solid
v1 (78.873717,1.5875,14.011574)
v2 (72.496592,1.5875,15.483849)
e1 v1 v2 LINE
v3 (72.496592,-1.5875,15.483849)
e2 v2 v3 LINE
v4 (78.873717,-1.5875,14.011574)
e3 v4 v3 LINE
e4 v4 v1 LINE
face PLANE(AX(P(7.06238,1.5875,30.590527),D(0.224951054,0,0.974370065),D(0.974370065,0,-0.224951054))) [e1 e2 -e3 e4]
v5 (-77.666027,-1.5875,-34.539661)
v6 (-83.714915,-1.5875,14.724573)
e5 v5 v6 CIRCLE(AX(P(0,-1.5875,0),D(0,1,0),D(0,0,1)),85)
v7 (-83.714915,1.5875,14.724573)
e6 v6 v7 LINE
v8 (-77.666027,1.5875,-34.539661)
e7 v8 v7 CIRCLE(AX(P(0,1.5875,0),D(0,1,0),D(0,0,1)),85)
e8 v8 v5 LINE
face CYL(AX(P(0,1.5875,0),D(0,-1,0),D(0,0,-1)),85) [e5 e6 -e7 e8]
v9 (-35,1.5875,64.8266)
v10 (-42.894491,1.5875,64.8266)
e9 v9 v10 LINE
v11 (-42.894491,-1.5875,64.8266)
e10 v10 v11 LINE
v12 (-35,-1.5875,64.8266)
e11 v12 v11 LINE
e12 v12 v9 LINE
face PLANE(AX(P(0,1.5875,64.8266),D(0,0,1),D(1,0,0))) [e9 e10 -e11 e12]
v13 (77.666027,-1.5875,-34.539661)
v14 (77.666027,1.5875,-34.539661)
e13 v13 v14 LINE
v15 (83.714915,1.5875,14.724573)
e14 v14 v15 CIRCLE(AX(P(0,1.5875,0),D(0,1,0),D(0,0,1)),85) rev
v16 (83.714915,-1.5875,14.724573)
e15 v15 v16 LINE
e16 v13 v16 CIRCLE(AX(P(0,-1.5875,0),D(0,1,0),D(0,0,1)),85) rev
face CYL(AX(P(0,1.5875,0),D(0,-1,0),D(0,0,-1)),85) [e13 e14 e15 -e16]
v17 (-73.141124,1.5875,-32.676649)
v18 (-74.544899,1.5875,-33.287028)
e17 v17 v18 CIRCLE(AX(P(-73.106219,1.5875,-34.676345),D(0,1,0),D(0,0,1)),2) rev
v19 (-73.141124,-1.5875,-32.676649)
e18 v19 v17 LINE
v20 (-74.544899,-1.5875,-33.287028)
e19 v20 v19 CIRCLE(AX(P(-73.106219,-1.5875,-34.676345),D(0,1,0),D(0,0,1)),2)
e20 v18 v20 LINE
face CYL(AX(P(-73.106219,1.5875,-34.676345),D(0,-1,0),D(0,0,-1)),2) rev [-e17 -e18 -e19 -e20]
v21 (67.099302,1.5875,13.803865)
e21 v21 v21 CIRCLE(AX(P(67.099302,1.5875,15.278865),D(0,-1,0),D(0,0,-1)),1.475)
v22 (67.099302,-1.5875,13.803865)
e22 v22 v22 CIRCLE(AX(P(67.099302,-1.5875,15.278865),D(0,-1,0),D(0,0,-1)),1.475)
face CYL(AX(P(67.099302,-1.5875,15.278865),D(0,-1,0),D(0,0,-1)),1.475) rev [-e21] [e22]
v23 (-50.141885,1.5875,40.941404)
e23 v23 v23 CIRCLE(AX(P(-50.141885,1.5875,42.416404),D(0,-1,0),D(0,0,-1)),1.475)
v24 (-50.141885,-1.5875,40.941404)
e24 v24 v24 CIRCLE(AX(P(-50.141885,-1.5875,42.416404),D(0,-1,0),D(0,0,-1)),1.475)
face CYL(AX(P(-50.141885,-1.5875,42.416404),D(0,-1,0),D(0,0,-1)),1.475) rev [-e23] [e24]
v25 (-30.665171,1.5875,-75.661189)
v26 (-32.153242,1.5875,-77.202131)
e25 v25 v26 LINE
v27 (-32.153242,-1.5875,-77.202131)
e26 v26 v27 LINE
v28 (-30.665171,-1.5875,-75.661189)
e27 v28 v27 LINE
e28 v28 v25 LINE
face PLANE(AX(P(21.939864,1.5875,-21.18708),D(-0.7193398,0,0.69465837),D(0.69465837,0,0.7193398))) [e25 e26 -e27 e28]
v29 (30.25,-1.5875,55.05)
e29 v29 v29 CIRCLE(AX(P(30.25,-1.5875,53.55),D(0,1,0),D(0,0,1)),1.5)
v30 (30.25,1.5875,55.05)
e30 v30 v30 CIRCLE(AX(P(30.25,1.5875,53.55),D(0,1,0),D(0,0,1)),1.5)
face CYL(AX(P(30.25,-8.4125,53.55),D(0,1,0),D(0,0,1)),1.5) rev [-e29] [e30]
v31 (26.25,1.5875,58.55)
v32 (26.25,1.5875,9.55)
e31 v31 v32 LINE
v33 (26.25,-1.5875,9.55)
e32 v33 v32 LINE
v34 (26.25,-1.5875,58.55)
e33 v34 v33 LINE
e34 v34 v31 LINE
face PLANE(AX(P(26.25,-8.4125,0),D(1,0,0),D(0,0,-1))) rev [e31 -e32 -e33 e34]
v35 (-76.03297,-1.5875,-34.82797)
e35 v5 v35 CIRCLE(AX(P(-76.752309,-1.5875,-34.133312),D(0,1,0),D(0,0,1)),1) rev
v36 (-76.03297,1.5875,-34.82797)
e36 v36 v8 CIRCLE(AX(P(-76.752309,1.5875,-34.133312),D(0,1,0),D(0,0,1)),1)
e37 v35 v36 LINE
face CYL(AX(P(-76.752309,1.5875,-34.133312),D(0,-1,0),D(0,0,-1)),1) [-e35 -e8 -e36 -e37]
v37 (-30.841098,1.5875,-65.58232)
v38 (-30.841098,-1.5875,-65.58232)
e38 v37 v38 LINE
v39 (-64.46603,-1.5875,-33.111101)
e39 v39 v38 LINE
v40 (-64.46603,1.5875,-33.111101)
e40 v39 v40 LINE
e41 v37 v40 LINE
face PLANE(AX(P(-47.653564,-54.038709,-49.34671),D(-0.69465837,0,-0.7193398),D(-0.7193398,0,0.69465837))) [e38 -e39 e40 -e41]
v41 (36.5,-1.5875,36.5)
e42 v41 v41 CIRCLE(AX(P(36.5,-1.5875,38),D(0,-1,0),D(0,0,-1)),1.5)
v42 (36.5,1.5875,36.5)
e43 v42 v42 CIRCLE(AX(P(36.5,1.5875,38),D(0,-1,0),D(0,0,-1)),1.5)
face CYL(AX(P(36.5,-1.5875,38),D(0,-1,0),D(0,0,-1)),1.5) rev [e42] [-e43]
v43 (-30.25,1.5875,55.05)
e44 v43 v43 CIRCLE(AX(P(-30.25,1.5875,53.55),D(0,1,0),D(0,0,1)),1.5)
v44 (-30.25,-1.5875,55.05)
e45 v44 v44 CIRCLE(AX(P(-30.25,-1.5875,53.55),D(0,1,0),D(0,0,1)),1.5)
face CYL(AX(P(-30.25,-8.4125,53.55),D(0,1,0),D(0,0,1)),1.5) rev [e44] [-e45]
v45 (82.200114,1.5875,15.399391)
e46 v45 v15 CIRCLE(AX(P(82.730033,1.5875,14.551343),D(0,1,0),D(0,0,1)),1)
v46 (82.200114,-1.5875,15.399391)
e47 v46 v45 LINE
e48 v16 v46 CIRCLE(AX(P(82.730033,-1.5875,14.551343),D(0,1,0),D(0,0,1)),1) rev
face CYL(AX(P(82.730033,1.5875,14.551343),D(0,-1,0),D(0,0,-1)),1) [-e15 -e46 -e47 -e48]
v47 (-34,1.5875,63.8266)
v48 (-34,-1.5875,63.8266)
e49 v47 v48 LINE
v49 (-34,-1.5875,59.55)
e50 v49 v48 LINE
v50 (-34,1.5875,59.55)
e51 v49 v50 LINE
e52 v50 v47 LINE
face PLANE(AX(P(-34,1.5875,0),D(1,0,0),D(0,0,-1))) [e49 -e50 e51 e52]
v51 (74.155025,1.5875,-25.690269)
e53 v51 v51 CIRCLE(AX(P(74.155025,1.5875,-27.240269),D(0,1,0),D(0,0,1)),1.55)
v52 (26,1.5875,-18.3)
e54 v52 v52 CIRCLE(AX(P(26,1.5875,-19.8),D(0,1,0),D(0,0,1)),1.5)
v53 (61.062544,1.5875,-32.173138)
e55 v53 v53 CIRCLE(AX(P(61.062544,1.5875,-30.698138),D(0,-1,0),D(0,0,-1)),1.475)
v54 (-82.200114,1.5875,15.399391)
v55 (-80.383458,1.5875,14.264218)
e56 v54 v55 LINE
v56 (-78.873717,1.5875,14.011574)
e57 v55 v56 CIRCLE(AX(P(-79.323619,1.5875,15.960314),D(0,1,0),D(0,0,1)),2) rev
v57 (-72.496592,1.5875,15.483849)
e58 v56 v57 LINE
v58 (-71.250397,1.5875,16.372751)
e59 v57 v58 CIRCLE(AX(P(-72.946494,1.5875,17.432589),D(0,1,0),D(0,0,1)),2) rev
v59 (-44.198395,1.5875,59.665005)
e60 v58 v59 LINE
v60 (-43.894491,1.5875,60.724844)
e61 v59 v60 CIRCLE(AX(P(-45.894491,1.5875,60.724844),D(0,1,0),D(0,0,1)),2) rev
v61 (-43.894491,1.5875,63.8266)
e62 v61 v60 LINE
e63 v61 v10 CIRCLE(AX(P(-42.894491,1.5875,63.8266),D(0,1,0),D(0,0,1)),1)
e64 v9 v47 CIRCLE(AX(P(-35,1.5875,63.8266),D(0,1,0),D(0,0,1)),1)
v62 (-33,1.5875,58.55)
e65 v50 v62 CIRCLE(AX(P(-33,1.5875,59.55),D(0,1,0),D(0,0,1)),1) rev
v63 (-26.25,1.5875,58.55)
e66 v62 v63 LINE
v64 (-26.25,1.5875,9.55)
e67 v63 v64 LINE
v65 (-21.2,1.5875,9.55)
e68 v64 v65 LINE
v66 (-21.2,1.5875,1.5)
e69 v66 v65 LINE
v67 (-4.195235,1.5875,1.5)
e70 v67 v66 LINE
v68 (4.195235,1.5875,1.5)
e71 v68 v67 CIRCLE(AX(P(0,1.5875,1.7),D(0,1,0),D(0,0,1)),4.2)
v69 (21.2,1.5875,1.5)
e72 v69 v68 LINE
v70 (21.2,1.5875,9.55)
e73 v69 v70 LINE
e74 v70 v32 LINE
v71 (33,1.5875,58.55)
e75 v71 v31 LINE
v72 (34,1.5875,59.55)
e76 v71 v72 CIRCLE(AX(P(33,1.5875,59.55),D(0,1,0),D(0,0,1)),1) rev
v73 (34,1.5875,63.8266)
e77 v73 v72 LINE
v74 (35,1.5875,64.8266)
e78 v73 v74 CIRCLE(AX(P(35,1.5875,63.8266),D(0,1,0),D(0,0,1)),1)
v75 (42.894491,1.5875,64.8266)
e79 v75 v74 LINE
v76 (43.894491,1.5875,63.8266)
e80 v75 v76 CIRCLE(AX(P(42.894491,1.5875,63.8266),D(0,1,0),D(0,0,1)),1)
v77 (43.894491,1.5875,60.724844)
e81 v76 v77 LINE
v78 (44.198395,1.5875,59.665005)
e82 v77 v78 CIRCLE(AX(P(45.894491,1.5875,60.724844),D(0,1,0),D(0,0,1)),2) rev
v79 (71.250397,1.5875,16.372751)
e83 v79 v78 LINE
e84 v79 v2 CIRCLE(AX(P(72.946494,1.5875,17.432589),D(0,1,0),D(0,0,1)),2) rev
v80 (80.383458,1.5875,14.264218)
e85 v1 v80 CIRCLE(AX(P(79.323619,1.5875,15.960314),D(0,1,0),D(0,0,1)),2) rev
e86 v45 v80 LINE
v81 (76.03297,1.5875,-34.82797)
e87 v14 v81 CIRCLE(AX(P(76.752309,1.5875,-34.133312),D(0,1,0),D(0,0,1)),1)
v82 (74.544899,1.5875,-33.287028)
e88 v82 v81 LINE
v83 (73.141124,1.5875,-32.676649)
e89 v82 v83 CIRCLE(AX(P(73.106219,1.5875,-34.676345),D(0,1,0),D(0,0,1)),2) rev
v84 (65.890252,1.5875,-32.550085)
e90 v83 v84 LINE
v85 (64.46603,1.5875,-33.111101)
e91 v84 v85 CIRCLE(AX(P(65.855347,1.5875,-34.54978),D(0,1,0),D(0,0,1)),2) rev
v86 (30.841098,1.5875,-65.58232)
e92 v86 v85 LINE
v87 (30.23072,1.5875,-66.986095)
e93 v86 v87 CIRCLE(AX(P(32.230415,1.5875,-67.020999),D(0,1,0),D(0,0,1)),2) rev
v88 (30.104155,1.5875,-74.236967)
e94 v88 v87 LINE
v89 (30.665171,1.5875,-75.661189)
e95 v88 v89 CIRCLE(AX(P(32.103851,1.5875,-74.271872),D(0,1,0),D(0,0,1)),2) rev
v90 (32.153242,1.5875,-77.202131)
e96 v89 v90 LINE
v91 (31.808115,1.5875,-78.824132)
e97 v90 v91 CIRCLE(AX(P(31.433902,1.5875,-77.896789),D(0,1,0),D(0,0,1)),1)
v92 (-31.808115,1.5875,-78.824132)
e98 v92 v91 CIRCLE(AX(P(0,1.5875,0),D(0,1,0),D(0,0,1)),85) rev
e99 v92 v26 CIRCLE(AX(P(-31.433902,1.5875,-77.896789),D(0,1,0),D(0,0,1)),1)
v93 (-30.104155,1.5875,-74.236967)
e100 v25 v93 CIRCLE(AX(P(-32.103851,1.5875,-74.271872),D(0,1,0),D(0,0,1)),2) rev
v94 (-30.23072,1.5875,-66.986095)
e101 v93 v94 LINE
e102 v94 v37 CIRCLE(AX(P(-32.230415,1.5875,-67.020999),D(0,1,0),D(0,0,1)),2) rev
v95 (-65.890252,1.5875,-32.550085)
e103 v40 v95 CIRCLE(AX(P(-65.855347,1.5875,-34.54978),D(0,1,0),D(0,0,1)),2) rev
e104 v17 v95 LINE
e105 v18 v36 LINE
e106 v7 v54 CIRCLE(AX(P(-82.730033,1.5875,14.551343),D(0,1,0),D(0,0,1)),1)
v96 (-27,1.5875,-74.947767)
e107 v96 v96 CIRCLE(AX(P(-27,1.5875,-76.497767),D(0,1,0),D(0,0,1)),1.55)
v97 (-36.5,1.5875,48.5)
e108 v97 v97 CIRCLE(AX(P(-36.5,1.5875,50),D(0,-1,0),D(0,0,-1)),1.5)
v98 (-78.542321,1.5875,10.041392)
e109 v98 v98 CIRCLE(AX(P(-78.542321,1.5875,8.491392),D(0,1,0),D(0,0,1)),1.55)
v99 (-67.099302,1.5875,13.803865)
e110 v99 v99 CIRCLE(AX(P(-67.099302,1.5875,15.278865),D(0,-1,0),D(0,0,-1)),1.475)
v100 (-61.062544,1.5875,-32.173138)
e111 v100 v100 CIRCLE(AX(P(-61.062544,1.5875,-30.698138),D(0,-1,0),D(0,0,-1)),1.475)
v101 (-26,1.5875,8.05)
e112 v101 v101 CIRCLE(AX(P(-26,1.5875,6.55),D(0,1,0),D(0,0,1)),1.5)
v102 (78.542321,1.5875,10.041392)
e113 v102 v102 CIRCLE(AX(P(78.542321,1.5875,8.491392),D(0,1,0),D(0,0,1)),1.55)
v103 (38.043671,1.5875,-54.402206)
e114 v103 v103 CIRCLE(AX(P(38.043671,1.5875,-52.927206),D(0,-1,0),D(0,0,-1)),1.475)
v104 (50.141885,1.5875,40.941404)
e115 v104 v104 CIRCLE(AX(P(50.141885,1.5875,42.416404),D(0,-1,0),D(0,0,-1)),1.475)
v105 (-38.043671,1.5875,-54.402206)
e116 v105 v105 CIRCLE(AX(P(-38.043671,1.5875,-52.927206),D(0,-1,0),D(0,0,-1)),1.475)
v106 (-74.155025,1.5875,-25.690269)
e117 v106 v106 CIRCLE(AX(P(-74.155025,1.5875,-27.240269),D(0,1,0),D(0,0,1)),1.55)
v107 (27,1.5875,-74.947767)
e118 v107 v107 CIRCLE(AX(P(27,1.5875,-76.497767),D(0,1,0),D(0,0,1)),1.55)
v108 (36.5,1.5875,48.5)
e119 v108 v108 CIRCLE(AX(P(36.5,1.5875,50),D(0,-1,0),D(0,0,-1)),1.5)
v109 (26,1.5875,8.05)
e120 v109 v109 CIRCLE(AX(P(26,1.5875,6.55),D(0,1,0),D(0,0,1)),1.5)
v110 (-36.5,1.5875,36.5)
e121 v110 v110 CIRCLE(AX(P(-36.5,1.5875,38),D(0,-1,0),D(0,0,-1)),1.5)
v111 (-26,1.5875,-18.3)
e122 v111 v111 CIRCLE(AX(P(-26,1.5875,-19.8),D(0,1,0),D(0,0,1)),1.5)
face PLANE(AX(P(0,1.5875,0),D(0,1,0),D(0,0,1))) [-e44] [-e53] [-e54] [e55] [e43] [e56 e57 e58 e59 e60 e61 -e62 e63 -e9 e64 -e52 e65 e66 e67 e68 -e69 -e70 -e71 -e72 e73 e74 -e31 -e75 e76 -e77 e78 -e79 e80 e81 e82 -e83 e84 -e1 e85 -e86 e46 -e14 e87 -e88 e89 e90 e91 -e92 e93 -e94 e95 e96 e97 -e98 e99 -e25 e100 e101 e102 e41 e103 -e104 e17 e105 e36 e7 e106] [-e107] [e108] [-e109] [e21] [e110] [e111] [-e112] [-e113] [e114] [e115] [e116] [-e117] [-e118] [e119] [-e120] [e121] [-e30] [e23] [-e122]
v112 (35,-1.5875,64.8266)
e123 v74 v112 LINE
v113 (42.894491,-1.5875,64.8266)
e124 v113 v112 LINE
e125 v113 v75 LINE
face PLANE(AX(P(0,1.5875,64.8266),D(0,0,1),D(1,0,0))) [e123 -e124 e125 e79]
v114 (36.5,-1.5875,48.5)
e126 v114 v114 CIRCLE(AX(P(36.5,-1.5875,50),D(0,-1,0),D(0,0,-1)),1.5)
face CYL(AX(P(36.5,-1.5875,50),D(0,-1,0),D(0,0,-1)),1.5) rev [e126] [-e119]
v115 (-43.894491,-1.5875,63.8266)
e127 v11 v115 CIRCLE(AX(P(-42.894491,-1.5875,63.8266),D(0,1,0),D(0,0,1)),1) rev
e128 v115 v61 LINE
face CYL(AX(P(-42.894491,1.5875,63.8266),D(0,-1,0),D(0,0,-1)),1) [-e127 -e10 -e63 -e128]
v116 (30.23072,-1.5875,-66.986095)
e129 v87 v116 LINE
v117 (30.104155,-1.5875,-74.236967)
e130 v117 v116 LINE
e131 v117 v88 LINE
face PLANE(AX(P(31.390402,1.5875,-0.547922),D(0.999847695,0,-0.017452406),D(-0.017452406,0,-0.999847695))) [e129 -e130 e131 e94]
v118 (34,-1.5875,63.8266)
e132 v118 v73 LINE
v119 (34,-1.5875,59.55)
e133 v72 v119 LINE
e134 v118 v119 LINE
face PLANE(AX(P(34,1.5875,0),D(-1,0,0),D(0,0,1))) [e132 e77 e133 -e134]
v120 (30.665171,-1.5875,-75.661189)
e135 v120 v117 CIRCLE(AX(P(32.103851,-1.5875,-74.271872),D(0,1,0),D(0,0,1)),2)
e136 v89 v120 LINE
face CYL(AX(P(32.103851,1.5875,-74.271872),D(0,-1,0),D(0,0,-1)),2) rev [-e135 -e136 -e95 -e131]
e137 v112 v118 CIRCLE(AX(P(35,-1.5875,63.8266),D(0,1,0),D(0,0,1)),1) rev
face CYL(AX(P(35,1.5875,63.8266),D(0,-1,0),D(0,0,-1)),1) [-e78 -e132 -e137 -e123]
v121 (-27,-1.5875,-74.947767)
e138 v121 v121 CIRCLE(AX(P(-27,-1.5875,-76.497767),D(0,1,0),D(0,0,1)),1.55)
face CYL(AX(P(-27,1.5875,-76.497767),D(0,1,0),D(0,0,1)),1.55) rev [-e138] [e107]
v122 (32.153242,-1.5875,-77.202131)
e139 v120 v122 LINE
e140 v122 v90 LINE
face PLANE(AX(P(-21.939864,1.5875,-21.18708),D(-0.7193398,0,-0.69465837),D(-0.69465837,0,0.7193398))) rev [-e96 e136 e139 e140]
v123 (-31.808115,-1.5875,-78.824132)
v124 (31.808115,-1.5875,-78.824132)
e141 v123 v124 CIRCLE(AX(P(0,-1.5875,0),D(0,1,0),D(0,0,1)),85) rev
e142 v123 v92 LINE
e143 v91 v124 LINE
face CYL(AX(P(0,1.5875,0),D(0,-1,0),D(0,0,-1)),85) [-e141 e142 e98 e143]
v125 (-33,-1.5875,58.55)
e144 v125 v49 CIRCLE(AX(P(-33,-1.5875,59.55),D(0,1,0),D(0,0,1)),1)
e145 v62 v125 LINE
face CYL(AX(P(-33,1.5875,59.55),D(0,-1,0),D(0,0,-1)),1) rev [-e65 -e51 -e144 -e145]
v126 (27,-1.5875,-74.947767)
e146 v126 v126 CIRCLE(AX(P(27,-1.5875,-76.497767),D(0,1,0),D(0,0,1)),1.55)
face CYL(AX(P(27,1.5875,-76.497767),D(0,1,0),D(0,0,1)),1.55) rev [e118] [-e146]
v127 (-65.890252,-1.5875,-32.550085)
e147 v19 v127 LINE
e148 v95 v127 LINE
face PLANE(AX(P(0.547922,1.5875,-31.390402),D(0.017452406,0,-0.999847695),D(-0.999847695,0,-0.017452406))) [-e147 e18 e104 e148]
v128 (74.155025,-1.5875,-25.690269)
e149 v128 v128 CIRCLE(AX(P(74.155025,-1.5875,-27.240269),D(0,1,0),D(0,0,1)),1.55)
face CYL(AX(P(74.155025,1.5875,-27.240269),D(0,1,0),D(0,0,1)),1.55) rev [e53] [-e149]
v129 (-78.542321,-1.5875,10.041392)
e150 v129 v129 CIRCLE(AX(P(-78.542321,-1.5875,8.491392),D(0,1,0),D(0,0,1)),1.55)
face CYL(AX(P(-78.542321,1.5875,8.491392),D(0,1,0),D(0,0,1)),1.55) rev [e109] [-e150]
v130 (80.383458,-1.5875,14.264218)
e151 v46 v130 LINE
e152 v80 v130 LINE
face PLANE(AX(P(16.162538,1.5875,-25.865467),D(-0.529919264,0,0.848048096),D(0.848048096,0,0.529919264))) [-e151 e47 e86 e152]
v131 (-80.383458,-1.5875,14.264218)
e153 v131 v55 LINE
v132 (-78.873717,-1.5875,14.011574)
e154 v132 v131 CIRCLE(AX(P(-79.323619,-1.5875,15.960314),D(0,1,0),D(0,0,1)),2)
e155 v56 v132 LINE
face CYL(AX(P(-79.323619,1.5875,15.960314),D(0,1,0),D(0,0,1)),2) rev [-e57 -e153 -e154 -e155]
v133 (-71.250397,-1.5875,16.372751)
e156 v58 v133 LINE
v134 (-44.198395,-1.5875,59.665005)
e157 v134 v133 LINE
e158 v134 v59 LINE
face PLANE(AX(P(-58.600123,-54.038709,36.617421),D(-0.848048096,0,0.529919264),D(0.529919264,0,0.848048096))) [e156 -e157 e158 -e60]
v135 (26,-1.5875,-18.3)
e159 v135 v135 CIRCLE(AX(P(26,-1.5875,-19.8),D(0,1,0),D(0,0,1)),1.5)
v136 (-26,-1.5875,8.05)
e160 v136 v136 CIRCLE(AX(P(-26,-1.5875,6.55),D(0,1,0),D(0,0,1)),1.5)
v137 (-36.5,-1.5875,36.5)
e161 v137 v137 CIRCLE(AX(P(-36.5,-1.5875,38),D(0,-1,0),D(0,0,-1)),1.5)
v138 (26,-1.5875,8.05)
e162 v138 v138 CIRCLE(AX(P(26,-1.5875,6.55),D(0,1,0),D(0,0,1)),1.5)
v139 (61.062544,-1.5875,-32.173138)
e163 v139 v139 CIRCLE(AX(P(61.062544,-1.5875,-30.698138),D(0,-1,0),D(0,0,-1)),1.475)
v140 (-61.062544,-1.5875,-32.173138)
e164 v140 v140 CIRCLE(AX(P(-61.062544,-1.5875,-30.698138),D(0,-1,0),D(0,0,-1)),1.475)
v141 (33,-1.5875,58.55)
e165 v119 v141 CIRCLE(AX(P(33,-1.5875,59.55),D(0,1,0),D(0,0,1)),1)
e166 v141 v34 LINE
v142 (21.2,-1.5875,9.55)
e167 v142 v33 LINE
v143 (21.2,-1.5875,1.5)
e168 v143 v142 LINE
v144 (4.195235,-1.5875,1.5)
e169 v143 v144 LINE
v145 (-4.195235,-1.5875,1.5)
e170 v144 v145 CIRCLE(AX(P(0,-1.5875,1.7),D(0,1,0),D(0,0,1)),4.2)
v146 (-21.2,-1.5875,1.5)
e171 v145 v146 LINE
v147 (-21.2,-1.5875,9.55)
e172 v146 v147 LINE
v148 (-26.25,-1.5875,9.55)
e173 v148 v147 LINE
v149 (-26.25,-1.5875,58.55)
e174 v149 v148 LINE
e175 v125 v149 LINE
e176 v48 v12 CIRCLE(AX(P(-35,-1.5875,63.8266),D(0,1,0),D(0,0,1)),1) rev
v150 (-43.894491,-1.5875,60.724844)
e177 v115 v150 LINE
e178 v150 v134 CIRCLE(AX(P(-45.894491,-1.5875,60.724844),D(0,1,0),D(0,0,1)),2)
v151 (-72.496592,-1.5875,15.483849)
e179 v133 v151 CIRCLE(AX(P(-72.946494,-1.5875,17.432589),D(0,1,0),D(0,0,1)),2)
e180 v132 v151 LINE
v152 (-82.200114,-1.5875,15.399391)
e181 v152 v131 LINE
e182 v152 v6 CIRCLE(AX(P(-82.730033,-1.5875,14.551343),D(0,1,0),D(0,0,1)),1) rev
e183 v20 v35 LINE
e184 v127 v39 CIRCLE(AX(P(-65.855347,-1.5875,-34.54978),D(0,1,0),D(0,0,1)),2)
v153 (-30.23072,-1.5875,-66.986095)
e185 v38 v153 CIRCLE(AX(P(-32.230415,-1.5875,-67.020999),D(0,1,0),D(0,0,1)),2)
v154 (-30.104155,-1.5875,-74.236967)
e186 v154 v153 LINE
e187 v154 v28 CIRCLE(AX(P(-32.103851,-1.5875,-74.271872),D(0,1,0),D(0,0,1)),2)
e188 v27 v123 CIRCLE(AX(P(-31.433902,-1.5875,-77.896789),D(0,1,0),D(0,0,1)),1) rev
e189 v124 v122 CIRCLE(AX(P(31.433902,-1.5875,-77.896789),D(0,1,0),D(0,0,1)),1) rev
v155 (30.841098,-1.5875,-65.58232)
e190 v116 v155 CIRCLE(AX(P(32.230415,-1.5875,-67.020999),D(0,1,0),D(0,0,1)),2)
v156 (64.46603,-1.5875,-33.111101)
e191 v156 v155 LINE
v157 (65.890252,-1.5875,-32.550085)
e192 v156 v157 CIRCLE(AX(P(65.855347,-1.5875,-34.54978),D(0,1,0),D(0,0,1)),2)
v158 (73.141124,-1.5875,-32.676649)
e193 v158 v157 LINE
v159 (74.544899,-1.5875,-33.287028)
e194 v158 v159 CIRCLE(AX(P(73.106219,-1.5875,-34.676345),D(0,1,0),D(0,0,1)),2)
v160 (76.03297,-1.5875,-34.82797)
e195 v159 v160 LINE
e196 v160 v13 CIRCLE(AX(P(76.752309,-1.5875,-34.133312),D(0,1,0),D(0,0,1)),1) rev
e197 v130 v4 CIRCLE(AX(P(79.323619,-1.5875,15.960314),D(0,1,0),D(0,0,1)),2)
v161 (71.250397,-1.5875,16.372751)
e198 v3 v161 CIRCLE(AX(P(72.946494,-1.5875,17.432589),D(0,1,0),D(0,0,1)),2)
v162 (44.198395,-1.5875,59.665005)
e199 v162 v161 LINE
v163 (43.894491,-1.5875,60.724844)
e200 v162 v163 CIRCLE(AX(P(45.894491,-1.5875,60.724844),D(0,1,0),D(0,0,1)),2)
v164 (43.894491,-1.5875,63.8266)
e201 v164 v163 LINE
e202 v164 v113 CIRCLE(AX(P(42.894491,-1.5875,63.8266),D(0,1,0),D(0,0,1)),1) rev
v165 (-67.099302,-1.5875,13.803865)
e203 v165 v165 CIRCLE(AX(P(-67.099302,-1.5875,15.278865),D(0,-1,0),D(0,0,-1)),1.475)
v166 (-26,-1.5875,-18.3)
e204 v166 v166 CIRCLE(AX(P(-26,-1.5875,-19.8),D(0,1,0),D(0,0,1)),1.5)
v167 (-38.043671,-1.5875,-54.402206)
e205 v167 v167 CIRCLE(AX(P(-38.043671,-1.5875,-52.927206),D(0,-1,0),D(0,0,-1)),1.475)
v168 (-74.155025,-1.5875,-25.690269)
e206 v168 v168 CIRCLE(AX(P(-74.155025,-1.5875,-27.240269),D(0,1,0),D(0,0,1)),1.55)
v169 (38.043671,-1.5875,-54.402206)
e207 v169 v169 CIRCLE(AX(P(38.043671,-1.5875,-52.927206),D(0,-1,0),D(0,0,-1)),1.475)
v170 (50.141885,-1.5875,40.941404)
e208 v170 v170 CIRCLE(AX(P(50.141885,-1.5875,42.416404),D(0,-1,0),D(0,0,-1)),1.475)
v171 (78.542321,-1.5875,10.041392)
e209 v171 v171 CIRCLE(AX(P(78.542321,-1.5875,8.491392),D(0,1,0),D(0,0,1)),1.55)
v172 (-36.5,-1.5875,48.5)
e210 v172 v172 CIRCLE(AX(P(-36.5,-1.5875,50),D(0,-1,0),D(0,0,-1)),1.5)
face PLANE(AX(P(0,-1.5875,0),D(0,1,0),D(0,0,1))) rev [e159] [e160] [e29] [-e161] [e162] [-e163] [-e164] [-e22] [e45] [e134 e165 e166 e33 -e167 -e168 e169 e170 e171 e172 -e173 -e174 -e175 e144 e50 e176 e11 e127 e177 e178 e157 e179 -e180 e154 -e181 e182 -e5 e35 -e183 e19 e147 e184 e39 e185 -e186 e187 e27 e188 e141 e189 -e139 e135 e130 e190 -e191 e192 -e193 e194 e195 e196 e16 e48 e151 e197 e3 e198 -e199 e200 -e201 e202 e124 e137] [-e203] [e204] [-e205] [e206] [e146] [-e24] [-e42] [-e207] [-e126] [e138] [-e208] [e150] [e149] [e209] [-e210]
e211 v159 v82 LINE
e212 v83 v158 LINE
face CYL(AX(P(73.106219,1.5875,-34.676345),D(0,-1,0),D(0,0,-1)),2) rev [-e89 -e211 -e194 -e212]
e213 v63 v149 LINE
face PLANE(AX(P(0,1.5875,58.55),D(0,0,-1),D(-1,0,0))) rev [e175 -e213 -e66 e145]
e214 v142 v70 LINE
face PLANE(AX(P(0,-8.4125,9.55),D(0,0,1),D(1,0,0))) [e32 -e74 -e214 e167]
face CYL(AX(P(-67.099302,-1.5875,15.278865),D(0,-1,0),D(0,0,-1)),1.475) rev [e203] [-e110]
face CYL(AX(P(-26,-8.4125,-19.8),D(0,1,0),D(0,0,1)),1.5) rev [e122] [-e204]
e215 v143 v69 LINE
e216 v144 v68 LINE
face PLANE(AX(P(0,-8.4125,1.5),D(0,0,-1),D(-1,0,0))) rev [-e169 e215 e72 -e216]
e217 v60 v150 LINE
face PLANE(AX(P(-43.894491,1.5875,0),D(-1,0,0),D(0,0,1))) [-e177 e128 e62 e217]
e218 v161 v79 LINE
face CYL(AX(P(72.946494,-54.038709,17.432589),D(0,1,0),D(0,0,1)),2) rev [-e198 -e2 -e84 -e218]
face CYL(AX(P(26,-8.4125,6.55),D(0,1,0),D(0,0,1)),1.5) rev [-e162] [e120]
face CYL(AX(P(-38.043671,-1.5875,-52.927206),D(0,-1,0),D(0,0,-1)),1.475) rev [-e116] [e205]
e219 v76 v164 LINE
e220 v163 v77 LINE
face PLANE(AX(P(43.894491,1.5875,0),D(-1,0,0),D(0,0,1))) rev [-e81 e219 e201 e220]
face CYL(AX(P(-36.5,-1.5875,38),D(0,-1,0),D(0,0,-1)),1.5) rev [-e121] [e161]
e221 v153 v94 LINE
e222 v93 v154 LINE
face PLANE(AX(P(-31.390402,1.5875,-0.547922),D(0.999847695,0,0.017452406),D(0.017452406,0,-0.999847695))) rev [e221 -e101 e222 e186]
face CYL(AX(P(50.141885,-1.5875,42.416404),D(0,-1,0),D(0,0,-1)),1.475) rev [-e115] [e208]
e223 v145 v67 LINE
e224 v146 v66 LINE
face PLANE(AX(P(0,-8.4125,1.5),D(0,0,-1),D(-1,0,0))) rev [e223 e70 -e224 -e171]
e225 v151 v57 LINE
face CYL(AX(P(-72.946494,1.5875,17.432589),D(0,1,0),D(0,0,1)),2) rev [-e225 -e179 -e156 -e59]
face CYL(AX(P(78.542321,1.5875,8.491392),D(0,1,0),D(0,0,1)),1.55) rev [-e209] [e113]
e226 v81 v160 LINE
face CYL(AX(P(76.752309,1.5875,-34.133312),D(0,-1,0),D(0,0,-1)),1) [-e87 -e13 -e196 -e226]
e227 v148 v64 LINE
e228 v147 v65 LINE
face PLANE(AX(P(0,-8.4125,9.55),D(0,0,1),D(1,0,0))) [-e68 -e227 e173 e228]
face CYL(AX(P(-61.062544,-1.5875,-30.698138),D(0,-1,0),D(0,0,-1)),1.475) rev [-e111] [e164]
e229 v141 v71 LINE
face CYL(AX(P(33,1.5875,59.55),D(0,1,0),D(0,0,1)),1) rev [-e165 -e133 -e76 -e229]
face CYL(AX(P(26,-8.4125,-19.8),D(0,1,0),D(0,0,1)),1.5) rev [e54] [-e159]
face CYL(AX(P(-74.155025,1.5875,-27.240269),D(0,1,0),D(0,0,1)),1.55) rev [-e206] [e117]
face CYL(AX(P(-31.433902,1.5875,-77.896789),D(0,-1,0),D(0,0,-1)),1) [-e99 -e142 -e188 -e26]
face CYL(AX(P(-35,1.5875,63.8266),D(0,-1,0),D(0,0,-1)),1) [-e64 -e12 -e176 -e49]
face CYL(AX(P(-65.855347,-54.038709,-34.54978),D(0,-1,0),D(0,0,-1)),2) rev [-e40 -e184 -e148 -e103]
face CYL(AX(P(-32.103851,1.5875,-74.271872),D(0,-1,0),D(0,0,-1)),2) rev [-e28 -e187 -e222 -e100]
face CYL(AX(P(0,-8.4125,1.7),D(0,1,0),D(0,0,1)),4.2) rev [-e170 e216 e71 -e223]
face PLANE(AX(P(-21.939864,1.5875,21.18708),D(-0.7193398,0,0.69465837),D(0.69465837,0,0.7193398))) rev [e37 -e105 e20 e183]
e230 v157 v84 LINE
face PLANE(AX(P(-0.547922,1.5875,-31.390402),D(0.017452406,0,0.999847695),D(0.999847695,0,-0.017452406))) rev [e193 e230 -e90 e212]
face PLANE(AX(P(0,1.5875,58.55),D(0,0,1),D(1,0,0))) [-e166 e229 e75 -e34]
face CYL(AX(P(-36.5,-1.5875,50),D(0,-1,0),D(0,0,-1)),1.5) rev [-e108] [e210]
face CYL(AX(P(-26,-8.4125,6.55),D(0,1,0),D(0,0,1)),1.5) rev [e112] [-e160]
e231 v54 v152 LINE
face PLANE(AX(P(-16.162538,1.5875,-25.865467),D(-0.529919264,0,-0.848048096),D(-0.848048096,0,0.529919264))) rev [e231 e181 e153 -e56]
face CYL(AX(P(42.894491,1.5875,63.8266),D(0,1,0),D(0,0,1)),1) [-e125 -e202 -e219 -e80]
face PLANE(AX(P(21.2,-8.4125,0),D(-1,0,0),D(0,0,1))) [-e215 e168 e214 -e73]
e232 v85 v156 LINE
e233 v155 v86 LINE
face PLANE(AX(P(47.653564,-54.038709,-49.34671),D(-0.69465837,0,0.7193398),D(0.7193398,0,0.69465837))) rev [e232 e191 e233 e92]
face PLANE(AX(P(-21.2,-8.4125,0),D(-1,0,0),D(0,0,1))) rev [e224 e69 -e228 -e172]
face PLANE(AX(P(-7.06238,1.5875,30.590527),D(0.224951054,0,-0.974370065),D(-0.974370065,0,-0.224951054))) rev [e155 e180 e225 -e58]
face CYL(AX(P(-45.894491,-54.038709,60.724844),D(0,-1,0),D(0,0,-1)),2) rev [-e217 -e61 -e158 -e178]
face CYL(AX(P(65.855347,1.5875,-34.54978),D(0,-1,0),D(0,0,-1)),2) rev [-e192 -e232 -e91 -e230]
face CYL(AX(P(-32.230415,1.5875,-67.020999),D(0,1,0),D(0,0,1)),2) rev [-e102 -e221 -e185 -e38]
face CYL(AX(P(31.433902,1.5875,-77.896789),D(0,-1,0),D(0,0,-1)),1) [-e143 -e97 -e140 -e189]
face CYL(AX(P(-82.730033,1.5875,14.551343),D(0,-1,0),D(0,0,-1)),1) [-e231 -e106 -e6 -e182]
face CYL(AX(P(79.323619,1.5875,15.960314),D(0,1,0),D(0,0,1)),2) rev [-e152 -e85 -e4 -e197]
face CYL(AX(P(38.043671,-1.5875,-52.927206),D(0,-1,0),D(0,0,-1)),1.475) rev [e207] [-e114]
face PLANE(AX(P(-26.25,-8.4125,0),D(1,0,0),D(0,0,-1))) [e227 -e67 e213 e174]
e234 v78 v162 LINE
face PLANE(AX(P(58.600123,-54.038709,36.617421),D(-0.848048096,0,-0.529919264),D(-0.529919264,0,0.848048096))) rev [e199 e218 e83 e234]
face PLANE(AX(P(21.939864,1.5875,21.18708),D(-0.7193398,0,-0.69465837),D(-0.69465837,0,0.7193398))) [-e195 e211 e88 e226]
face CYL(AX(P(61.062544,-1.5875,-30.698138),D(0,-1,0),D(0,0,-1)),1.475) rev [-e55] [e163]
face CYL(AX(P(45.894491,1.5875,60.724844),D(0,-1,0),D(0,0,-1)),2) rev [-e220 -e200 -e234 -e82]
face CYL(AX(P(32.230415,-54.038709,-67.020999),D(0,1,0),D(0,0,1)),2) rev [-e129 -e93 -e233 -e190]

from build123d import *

# Parameters (mm, degrees)
BOSS_EXTRUDE4_DEPTH  = 1.5875
M3_CLEARANCE_HOLE3_D = 3
M3_CLEARANCE_HOLE1_D = 3.1
M3_CLEARANCE_HOLE4_D = 2.95
M3_CLEARANCE_HOLE2_D = 3.1
BOSS_EXTRUDE6_DEPTH  = 3.175
FILLET1_R            = 2
FILLET3_R            = 1
FILLET6_R            = 0.5
CUT_EXTRUDE4_DEPTH   = 10
SKETCH29_R           = 1.5
CUT_EXTRUDE5_DEPTH   = 10
SKETCH31_R           = 1.5
CUT_EXTRUDE7_DEPTH   = 10


with BuildPart() as part:
    # Sketch1 → Boss-Extrude4 (new, symmetric)
    with BuildSketch(Plane(origin=(0, 0, 0), x_dir=(1, 0, 0), z_dir=(0, 1, 0))):
        with BuildLine():
            Line((-62.799553621, 32.496136604), (-73.969425011, 32.691107434))
            Line((-73.969425011, 32.691107434), (-77.053684287, 35.88495141))
            ThreePointArc((-77.053684287, 35.88495141), (-84.36642289, 10.358894189), (-83.446216027, -16.178041625))
            Line((-83.446216027, -16.178041625), (-79.680911643, -13.825218315))
            Line((-79.680911643, -13.825218315), (-69.484649137, -16.179210996))
            Line((-69.484649137, -16.179210996), (-43.894490772, -57.132025032))
            Line((-43.894490772, -57.132025032), (-43.894490772, -64.826600275))
            Line((-43.894490772, -64.826600275), (-43.094490772, -64.826600275))
            Line((-43.094490772, -64.826600275), (-34, -64.826600275))
            Line((-34, -64.826600275), (-34, -59.55))
            Line((-34, -59.55), (-34, -58.55))
            Line((-34, -58.55), (-20, -58.55))
            Line((-20, -58.55), (-19.859459165, -59.55))
            Line((-19.859459165, -59.55), (19.859459165, -59.55))
            Line((19.859459165, -59.55), (20, -58.55))
            Line((20, -58.55), (34, -58.55))
            Line((34, -58.55), (34, -59.55))
            Line((34, -59.55), (34, -64.826600275))
            Line((34, -64.826600275), (43.094490772, -64.826600275))
            Line((43.094490772, -64.826600275), (43.894490772, -64.826600275))
            Line((43.894490772, -64.826600275), (43.894490772, -57.132025032))
            Line((43.894490772, -57.132025032), (69.484649137, -16.179210996))
            Line((69.484649137, -16.179210996), (79.680911643, -13.825218315))
            Line((79.680911643, -13.825218315), (83.446216027, -16.178041625))
            ThreePointArc((83.446216027, -16.178041625), (84.610662337, -8.126242604), (85, 0))
            ThreePointArc((85, 0), (82.98964744, 18.377116688), (77.053684287, 35.88495141))
            Line((77.053684287, 35.88495141), (73.969425011, 32.691107434))
            Line((73.969425011, 32.691107434), (62.799553621, 32.496136604))
            Line((62.799553621, 32.496136604), (30.284668021, 63.895396642))
            Line((30.284668021, 63.895396642), (30.089697191, 75.065268032))
            Line((30.089697191, 75.065268032), (33.173956467, 78.259112008))
            ThreePointArc((33.173956467, 78.259112008), (0, 85), (-33.173956467, 78.259112008))
            Line((-33.173956467, 78.259112008), (-30.089697191, 75.065268032))
            Line((-30.089697191, 75.065268032), (-30.284668021, 63.895396642))
            Line((-30.284668021, 63.895396642), (-62.799553621, 32.496136604))
        make_face()
    extrude(amount=BOSS_EXTRUDE4_DEPTH, both=True)

    # M3 Clearance Hole3 (through all)
    with Locations(Plane(origin=(0, -1.5875, 0), x_dir=(-1, 0, 0), z_dir=(0, -1, 0))):
        with Locations((36.5, -50), (36.5, -38), (-36.5, -50), (-36.5, -38)):
            Hole(M3_CLEARANCE_HOLE3_D / 2)

    # M3 Clearance Hole1 (through all)
    with Locations(Plane(origin=(0, 1.5875, 0), x_dir=(1, 0, 0), z_dir=(0, 1, 0))):
        with Locations((-78.542321426, -8.49139241), (78.542321426, -8.49139241), (74.155025063, 27.240269049), (-74.155025063, 27.240269049)):
            Hole(M3_CLEARANCE_HOLE1_D / 2)

    # M3 Clearance Hole4 (through all)
    with Locations(Plane(origin=(0, -1.5875, 0), x_dir=(-1, 0, 0), z_dir=(0, -1, 0))):
        with Locations((-67.099301622, -15.278865202), (-50.141885166, -42.416404279), (-61.062544382, 30.698137949), (-38.043670771, 52.927205804), (50.141885166, -42.416404279), (67.099301622, -15.278865202), (38.043670771, 52.927205804), (61.062544382, 30.698137949)):
            Hole(M3_CLEARANCE_HOLE4_D / 2)

    # M3 Clearance Hole2 (through all)
    with Locations(Plane(origin=(0, 1.5875, 0), x_dir=(1, 0, 0), z_dir=(0, 1, 0))):
        with Locations((27, 76.497766718), (-27, 76.497766718)):
            Hole(M3_CLEARANCE_HOLE2_D / 2)

    # Sketch22 → Boss-Extrude6 (add)
    with BuildSketch(Plane(origin=(0, 1.5875, 0), x_dir=(1, 0, 0), z_dir=(0, 1, 0))):
        Polygon((65.061950694, 32.535626892), (30.245177733, 66.157793715), (30.284668021, 63.895396642), (62.799553621, 32.496136604), align=None)
        Polygon((-30.284668021, 63.895396642), (-30.245177733, 66.157793715), (-65.061950694, 32.535626892), (-62.799553621, 32.496136604), align=None)
        Polygon((43.894490772, -60.151352895), (71.689396914, -15.670204865), (69.484649137, -16.179210996), (43.894490772, -57.132025032), align=None)
        Polygon((-69.484649137, -16.179210996), (-71.689396914, -15.670204865), (-43.894490772, -60.151352895), (-43.894490772, -57.132025032), align=None)
    extrude(amount=-BOSS_EXTRUDE6_DEPTH)

    # Fillet1
    fillet1_edges = [part.edges().sort_by_distance(p)[0] for p in [
        (-30.245177733, 0.79375, -66.157793715),
        (-65.061950694, 0.79375, -32.535626892),
        (-71.689396914, 0.79375, 15.670204865),
        (-43.894490772, 0.79375, 60.151352895),
        (43.894490772, -0.79375, 60.151352895),
        (71.689396914, -0.79375, 15.670204865),
        (65.061950694, 0.79375, -32.535626892),
        (30.245177733, -0.79375, -66.157793715),
        (30.089697191, -0.79375, -75.065268032),
        (73.969425011, -0.79375, -32.691107434),
        (79.680911643, -0.79375, 13.825218315),
        (-79.680911643, -0.79375, 13.825218315),
        (-73.969425011, -0.79375, -32.691107434),
        (-30.089697191, -0.79375, -75.065268032),
    ]]
    fillet(fillet1_edges, radius=FILLET1_R)

    # Fillet3
    fillet3_edges = [part.edges().sort_by_distance(p)[0] for p in [
        (33.173956467, -0.79375, -78.259112008),
        (77.053684287, 0.79375, -35.88495141),
        (83.446216027, -0.79375, 16.178041625),
        (43.894490772, -0.79375, 64.826600275),
        (34, 0.79375, 64.826600275),
        (34, -0.79375, 58.55),
        (-34, -0.79375, 58.55),
        (-34, 0.79375, 64.826600275),
        (-43.894490772, -0.79375, 64.826600275),
        (-83.446216027, -0.79375, 16.178041625),
        (-77.053684287, -0.79375, -35.88495141),
        (-33.173956467, -0.79375, -78.259112008),
    ]]
    fillet(fillet3_edges, radius=FILLET3_R - 0.0001)  # a hair under: the kernel refuses the full size

    # Fillet6
    fillet6_edges = [part.edges().sort_by_distance(p)[0] for p in [
        (20, -0.79375, 58.55),
        (19.859459165, -0.79375, 59.55),
        (-19.859459165, 0.79375, 59.55),
        (-20, 0.79375, 58.55),
    ]]
    fillet(fillet6_edges, radius=FILLET6_R)

    # Sketch28 → Cut-Extrude4 (cut)
    with BuildSketch(Plane(origin=(0, 1.5875, 0), x_dir=(1, 0, 0), z_dir=(0, 1, 0))):
        with BuildLine():
            Line((-26.25, -9.55), (-26.25, -59.55))
            Line((-26.25, -59.55), (26.25, -59.55))
            Line((26.25, -59.55), (26.25, -9.55))
            Line((26.25, -9.55), (21.2, -9.55))
            Line((21.2, -9.55), (21.2, -1.5))
            Line((21.2, -1.5), (4.195235393, -1.5))
            ThreePointArc((4.195235393, -1.5), (0, 2.5), (-4.195235393, -1.5))
            Line((-4.195235393, -1.5), (-21.2, -1.5))
            Line((-21.2, -1.5), (-21.2, -9.55))
            Line((-21.2, -9.55), (-26.25, -9.55))
        make_face()
    extrude(amount=-CUT_EXTRUDE4_DEPTH, mode=Mode.SUBTRACT)

    # Sketch29 → Cut-Extrude5 (cut)
    with BuildSketch(Plane(origin=(0, 1.5875, 0), x_dir=(1, 0, 0), z_dir=(0, 1, 0))):
        with Locations(Location((30.25, -53.55, 0), (0, 0, 270))):
            Circle(SKETCH29_R)
        with Locations(Location((-30.25, -53.55, 0), (0, 0, 270))):
            Circle(SKETCH29_R)
    extrude(amount=-CUT_EXTRUDE5_DEPTH, mode=Mode.SUBTRACT)

    # Sketch31 → Cut-Extrude7 (cut)
    with BuildSketch(Plane(origin=(0, 1.5875, 0), x_dir=(1, 0, 0), z_dir=(0, 1, 0))):
        with Locations(Location((-26, -6.55, 0), (0, 0, 270))):
            Circle(SKETCH31_R)
        with Locations(Location((26, -6.55, 0), (0, 0, 270))):
            Circle(SKETCH31_R)
        with Locations(Location((-26, 19.8, 0), (0, 0, 270))):
            Circle(SKETCH31_R)
        with Locations(Location((26, 19.8, 0), (0, 0, 270))):
            Circle(SKETCH31_R)
    extrude(amount=-CUT_EXTRUDE7_DEPTH, mode=Mode.SUBTRACT)


solid = part.part
